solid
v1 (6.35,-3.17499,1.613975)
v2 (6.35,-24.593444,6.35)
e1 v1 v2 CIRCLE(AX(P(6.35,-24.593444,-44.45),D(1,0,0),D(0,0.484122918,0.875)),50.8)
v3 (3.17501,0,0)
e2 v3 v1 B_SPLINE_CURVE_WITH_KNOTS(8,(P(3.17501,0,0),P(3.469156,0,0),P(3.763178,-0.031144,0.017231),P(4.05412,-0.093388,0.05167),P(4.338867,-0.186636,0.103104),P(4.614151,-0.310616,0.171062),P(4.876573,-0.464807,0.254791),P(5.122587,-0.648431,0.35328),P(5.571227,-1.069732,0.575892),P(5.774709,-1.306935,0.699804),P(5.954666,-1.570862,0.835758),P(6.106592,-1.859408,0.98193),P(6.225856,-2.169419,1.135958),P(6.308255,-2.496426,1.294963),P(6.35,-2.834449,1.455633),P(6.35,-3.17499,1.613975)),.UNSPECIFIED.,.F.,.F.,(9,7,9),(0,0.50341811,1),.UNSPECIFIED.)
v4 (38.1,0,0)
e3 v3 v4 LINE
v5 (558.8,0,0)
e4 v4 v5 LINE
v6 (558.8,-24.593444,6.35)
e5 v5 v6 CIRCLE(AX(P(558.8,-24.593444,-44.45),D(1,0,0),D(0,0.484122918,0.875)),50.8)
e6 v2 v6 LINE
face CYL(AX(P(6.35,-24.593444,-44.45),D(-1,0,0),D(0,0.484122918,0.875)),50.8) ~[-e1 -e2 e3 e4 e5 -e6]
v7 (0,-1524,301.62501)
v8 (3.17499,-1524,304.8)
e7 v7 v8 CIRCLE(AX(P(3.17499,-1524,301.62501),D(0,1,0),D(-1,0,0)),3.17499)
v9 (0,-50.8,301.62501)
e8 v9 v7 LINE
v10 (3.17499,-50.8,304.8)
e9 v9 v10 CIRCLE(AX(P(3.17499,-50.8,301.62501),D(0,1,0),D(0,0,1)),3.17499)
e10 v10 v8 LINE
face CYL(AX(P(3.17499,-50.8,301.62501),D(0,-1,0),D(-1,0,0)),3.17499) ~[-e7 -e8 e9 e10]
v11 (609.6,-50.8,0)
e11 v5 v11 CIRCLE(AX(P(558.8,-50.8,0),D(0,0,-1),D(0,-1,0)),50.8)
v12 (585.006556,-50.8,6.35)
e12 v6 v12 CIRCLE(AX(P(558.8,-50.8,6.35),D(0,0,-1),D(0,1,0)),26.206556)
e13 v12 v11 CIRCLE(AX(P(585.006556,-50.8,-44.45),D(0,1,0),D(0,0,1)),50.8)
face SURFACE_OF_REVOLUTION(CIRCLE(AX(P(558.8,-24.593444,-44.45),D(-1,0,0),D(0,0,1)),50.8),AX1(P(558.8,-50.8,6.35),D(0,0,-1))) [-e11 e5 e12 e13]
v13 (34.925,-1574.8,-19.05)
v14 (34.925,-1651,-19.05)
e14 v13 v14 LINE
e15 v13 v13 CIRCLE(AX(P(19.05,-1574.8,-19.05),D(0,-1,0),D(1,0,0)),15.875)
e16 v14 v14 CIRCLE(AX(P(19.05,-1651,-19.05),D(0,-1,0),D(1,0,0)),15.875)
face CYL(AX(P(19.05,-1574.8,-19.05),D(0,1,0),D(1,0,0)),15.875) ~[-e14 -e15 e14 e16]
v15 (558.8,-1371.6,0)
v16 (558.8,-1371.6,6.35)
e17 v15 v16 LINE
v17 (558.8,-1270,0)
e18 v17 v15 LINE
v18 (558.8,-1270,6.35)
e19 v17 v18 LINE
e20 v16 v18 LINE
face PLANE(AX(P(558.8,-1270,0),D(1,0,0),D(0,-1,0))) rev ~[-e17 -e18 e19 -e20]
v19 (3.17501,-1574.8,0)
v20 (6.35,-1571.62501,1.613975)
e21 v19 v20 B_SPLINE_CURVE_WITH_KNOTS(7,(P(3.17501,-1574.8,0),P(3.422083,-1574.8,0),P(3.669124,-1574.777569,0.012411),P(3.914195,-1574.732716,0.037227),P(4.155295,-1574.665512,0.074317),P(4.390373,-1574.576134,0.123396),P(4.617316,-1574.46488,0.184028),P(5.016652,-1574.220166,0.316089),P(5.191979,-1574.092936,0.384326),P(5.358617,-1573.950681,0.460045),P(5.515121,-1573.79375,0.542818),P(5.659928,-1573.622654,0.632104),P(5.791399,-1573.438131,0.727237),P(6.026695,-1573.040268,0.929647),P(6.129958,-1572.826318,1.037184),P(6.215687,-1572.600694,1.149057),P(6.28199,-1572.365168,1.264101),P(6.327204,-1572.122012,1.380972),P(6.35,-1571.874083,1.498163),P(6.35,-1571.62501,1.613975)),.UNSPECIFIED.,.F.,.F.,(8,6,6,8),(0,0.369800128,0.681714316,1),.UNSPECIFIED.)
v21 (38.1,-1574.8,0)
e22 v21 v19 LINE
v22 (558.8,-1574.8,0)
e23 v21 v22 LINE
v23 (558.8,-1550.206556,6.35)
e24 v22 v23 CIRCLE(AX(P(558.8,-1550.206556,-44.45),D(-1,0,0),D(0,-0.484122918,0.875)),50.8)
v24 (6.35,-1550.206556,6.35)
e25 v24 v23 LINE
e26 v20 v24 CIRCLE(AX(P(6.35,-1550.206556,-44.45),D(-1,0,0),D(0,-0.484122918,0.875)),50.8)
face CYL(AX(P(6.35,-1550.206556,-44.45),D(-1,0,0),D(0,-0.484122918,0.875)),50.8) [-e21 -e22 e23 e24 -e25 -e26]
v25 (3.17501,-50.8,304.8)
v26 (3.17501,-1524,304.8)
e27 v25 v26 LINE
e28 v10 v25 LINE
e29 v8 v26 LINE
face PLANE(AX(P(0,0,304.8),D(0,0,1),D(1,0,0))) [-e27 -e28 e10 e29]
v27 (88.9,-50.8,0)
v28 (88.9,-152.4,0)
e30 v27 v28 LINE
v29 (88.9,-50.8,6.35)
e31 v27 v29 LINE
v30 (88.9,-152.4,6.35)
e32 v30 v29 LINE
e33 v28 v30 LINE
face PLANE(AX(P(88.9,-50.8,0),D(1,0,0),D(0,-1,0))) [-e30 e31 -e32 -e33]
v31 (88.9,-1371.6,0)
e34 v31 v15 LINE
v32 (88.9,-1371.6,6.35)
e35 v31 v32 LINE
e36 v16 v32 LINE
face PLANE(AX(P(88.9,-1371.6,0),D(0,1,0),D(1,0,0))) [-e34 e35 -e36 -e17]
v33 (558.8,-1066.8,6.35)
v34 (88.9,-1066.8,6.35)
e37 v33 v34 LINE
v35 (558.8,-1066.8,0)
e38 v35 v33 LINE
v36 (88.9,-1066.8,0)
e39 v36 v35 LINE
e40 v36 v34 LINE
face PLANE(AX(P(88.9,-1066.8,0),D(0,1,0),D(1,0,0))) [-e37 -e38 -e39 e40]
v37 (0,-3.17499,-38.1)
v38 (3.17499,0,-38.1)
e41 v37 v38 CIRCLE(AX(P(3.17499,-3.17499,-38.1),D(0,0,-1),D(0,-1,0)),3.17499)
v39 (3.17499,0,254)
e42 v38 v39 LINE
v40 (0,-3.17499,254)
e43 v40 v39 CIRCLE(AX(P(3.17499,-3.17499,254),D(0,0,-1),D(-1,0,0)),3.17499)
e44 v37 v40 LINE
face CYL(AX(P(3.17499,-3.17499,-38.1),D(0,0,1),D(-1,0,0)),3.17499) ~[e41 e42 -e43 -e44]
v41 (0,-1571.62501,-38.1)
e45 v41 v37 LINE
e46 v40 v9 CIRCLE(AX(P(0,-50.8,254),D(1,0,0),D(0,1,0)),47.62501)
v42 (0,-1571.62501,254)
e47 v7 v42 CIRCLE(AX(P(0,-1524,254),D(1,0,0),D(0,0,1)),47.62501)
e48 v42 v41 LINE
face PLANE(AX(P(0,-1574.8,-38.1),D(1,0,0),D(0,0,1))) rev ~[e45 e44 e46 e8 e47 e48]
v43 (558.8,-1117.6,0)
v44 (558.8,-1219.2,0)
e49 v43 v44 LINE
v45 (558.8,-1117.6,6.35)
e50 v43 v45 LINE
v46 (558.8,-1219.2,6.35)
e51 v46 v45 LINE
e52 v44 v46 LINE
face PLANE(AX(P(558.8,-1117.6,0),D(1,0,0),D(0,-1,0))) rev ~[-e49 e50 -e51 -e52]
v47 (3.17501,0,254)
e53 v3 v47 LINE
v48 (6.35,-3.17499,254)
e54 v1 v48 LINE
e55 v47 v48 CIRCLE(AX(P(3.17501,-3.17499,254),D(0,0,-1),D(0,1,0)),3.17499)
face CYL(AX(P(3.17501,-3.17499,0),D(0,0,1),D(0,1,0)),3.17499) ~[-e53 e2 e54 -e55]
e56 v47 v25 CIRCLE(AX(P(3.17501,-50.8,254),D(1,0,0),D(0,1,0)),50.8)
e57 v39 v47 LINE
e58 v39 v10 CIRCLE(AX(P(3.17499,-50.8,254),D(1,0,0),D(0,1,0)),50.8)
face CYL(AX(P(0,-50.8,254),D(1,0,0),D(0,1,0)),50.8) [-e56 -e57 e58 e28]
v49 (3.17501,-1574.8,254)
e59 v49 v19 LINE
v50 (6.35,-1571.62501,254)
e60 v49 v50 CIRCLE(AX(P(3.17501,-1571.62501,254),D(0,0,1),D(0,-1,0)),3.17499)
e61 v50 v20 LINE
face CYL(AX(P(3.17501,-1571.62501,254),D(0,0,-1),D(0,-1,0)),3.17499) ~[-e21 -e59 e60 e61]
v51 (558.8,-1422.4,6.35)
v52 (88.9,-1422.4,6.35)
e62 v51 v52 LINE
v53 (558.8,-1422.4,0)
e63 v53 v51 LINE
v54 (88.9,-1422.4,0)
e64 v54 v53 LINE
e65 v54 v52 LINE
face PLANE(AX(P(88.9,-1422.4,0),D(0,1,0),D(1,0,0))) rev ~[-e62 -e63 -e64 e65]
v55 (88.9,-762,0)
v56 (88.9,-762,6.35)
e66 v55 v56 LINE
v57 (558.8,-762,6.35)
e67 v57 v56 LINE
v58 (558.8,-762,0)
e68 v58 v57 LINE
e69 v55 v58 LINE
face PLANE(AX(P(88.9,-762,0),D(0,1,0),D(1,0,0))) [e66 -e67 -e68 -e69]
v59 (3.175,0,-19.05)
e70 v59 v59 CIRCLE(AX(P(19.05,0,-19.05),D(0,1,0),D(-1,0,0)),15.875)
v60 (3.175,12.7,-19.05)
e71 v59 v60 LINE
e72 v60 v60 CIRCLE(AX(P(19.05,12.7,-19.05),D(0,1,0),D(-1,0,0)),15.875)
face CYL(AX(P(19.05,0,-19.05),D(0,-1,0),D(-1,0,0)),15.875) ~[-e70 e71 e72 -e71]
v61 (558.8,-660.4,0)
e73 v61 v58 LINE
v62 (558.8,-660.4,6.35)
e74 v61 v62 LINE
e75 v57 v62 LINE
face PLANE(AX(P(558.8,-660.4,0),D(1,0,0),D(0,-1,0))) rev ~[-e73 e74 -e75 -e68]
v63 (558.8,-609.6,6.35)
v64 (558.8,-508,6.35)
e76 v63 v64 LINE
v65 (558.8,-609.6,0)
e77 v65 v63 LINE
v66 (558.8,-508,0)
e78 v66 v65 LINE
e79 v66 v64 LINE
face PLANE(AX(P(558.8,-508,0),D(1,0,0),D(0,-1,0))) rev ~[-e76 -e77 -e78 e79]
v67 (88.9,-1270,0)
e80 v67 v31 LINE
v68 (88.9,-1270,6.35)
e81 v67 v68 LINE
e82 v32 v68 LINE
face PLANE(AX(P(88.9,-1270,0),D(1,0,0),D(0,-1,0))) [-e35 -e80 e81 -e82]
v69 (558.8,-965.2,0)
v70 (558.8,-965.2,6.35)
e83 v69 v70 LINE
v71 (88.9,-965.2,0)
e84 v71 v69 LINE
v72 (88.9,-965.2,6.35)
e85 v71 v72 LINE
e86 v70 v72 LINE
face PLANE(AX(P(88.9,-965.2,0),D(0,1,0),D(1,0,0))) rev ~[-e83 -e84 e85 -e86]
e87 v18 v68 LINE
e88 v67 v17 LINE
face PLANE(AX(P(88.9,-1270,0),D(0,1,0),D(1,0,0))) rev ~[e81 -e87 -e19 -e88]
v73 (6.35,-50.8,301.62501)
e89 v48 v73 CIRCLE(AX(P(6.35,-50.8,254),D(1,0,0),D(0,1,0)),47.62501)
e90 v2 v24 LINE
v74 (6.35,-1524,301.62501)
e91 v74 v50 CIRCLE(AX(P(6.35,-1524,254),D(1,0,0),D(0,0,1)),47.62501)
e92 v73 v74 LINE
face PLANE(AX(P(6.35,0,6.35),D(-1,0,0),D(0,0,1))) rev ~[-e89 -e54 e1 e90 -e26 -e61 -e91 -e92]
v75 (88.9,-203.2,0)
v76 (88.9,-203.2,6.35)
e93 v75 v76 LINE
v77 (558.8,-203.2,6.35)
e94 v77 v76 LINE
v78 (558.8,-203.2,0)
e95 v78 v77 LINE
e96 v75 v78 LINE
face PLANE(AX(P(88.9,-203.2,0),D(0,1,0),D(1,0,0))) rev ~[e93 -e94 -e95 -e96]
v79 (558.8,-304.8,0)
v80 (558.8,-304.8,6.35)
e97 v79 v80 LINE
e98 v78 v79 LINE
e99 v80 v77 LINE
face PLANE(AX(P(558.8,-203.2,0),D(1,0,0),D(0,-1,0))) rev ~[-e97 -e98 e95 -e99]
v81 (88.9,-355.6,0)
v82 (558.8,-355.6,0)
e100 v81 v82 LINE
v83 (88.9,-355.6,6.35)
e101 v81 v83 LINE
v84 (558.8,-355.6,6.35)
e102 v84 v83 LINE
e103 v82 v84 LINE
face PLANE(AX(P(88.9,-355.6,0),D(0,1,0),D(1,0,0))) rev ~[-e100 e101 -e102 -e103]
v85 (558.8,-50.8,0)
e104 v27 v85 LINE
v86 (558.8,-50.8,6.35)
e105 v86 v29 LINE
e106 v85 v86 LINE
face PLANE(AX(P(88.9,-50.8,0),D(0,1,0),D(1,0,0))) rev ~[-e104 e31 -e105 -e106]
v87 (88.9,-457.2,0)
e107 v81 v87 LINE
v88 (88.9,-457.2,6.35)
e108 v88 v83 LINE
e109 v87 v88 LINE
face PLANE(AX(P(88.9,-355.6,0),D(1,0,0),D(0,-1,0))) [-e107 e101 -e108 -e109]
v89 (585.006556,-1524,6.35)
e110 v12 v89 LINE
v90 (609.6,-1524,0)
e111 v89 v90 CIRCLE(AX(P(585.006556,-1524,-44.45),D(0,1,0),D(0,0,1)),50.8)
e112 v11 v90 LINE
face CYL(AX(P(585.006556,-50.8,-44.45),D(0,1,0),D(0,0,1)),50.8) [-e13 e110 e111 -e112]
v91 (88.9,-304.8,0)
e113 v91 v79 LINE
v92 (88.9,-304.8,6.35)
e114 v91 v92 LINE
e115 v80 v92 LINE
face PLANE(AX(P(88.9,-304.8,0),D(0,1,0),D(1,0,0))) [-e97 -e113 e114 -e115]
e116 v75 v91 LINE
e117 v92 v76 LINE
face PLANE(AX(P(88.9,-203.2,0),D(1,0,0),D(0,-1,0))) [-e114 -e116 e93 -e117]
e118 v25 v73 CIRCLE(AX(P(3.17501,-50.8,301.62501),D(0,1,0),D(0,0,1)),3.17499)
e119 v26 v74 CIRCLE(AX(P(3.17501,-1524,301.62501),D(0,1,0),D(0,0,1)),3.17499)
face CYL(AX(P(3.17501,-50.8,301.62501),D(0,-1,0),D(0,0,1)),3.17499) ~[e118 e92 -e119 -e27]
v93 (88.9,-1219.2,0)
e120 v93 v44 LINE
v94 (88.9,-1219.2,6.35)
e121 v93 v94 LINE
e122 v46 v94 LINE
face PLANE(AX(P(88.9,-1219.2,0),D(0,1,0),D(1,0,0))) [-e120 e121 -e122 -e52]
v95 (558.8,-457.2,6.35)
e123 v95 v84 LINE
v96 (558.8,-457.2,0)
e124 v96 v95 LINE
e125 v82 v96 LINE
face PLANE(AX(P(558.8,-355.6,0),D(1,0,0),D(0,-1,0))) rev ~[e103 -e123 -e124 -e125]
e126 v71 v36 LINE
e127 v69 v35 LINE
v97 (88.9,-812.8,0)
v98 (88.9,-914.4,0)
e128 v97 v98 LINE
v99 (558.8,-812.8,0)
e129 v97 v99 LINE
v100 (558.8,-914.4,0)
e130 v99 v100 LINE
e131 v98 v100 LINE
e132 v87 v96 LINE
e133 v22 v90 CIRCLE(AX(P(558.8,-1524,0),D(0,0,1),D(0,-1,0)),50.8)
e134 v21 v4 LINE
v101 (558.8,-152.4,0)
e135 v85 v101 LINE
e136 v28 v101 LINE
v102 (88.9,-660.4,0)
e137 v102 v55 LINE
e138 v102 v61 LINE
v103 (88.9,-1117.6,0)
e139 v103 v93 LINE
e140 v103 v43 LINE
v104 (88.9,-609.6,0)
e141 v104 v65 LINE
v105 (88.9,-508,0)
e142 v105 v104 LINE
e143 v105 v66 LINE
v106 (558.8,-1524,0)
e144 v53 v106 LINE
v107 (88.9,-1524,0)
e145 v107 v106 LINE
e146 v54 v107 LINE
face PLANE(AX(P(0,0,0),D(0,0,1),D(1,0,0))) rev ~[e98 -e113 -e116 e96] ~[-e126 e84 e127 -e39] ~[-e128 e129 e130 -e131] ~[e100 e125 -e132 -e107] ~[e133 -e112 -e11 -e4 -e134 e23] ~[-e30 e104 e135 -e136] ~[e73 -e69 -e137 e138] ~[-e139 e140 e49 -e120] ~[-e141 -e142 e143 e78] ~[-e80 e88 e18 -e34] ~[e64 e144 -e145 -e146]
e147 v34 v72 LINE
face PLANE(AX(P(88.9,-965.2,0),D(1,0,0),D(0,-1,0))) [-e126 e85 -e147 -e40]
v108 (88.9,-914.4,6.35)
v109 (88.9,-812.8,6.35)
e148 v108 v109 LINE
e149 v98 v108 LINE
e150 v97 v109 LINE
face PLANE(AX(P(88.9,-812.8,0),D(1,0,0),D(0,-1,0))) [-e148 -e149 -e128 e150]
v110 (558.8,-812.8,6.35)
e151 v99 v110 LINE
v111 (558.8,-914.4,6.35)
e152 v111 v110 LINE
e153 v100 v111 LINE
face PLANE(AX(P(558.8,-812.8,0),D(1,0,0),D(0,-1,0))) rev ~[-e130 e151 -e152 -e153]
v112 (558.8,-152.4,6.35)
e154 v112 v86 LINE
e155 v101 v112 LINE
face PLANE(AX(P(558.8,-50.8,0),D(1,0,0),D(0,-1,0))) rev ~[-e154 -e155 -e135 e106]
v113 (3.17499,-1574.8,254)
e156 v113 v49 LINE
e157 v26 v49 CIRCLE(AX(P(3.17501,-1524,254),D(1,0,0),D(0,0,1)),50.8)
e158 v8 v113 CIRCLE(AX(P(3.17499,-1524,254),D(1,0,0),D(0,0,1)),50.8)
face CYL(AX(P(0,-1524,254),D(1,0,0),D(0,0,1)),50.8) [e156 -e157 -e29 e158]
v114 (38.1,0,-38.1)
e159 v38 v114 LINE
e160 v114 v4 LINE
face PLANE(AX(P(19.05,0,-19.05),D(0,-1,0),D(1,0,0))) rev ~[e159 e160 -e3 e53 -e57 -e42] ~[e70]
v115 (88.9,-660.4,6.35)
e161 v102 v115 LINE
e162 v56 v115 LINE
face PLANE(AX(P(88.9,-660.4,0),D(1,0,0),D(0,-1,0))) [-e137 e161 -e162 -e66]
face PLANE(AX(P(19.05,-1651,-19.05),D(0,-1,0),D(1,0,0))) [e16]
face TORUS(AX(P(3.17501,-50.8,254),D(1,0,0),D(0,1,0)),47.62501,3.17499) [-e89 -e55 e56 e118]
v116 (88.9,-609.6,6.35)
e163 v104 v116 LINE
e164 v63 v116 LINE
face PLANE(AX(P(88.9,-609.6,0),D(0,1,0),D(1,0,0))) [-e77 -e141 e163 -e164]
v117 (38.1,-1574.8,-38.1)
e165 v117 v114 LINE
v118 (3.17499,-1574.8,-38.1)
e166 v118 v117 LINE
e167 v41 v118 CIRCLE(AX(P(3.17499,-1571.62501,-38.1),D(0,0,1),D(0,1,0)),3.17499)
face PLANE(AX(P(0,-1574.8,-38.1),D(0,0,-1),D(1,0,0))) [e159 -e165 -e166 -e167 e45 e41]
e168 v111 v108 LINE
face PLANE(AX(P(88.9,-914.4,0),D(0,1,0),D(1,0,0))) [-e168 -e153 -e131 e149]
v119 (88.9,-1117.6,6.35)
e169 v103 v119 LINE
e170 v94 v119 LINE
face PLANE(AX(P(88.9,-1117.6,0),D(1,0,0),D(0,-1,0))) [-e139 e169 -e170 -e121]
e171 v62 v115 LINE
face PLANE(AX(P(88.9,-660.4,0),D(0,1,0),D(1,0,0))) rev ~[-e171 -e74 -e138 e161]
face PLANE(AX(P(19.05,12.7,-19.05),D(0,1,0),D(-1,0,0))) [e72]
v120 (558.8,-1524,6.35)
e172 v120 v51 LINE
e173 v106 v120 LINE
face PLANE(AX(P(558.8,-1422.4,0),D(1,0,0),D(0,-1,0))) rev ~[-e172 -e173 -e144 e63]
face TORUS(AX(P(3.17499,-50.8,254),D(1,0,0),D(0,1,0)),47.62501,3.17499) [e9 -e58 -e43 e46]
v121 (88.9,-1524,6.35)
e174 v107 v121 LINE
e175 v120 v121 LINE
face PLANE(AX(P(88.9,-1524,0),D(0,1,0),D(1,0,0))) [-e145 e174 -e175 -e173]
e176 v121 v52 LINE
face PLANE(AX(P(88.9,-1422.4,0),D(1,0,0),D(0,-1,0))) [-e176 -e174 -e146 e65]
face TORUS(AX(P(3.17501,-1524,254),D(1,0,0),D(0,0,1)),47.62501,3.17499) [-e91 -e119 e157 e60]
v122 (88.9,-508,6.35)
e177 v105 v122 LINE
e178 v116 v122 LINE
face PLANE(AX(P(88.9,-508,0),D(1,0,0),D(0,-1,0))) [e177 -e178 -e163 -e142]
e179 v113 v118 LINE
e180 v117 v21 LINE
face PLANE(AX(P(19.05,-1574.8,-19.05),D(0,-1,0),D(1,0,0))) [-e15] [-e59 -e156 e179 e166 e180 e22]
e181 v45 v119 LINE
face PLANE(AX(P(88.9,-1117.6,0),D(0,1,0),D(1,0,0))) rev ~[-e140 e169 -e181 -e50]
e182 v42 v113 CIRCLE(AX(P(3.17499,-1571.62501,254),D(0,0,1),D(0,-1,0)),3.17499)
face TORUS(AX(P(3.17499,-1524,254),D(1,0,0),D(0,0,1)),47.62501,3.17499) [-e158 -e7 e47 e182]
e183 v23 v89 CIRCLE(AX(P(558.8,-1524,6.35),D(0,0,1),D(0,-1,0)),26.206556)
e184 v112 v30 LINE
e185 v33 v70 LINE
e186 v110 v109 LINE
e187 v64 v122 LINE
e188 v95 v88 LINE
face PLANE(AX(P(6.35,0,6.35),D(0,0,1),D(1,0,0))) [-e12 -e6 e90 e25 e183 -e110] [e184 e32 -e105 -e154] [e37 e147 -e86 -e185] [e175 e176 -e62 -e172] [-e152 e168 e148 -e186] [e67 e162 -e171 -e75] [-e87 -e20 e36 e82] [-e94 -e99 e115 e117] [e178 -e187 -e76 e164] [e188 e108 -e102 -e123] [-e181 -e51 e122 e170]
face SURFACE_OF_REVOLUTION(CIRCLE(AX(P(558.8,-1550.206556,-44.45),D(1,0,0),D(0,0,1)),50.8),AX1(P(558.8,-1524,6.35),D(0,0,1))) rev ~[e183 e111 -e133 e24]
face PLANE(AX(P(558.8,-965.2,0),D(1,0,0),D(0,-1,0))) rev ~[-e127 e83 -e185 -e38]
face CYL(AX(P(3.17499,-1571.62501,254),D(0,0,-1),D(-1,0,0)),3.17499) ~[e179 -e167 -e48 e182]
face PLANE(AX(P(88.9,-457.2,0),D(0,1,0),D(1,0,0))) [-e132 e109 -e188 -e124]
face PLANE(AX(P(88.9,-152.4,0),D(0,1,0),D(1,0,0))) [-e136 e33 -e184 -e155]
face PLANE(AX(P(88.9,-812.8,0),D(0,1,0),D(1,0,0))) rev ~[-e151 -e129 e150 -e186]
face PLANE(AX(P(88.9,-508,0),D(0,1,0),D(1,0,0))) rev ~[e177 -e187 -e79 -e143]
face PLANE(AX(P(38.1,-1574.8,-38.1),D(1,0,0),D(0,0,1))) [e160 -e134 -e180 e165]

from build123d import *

# Parameters (mm, degrees)
F0_W         = 6.35
F0_H         = 298.45
F0_W_2       = 603.25
F0_H_2       = 6.35
F1_DEPTH     = 1574.8
F2_W         = 38.1
F2_H         = 38.1
F3_DEPTH     = 1574.8
F4_R         = 15.875
F5_DEPTH     = 76.2
F6_R         = 15.875
F7_DEPTH     = 12.7
F8_W         = 469.9
F8_H         = 101.6
F9_DEPTH     = 25.4
F10_R        = 50.8
F11_T1_DEPTH = 1473.2
F11_T3_DEPTH = 552.45
F11_T6_ANGLE = 90
F11_T8_ANGLE = 90
F12_R        = 3.17499


# Not quite as in the source:
# - a fillet or chamfer that OpenCascade refuses, or shapes differently, is made with other operations: its cross-section is extruded or revolved along the edge and cut away or added
# - a fillet or chamfer is up to 0.001 mm smaller than in the source, because OpenCascade refuses the exact size


with BuildPart() as f1:
    # F0 (on Front) → F1 (new body)
    with BuildSketch(Plane.XZ):
        with Locations((3.175, 155.575)):
            Rectangle(F0_W, F0_H)
        with Locations((307.975, 3.175)):
            Rectangle(F0_W_2, F0_H_2)
        with Locations((3.175, 3.175)):
            Rectangle(F0_W, F0_H_2)
    extrude(amount=F1_DEPTH)

    # F2 (on face) → F3 (join)
    with BuildSketch(Plane.XZ.offset(1574.8)):
        with Locations((19.05, -19.05)):
            Rectangle(F2_W, F2_H)
    extrude(amount=-F3_DEPTH)

    # F4 (on face) → F5 (join)
    with BuildSketch(Plane.XZ.offset(1574.8)):
        with Locations((19.05, -19.05)):
            Circle(F4_R)
    extrude(amount=F5_DEPTH)

    # F6 (on face) → F7 (join)
    with BuildSketch(Plane(origin=(0, 0, 0), x_dir=(-1, 0, 0), z_dir=(0, 1, 0))):
        with Locations((-19.05, -19.05)):
            Circle(F6_R)
    extrude(amount=F7_DEPTH)

    # F8 (on face) → F9 (cut)
    with BuildSketch(Plane(origin=(0, 0, 0), x_dir=(1, 0, 0), z_dir=(0, 0, -1))):
        with Locations((323.85, 1473.2)):
            Rectangle(F8_W, F8_H)
        with Locations((323.85, 1320.8)):
            Rectangle(F8_W, F8_H)
        with Locations((323.85, 1168.4)):
            Rectangle(F8_W, F8_H)
        with Locations((323.85, 1016)):
            Rectangle(F8_W, F8_H)
        with Locations((323.85, 863.6)):
            Rectangle(F8_W, F8_H)
        with Locations((323.85, 711.2)):
            Rectangle(F8_W, F8_H)
        with Locations((323.85, 558.8)):
            Rectangle(F8_W, F8_H)
        with Locations((323.85, 406.4)):
            Rectangle(F8_W, F8_H)
        with Locations((323.85, 254)):
            Rectangle(F8_W, F8_H)
        with Locations((323.85, 101.6)):
            Rectangle(F8_W, F8_H)
    extrude(amount=-F9_DEPTH, mode=Mode.SUBTRACT)

    # F10
    f10_edges = [f1.edges().sort_by_distance(p)[0] for p in [
        (609.6, 0, 3.175),
        (609.6, -1574.8, 3.175),
        (3.175, -1574.8, 304.8),
        (3.175, 0, 304.8),
    ]]
    fillet(f10_edges, radius=F10_R)

    # F11: fillet of radius 50.8 on 1 edges, made by hand

    # F11_s2 → F11_t1 (cut)
    with BuildSketch(Plane.XZ.offset(50.8)):
        with BuildLine():
            ThreePointArc((585.0065557516, 6.35), (597.7065557516, 4.7368884968), (609.6, 0))
            Line((609.6, 0), (609.6, 6.35))
            Line((609.6, 6.35), (585.0065557516, 6.35))
        make_face()
    extrude(amount=F11_T1_DEPTH, mode=Mode.SUBTRACT)

    # F11_s4 → F11_t3 (cut)
    with BuildSketch(Plane.YZ.offset(6.35)):
        with BuildLine():
            ThreePointArc((-1574.8, 0), (-1562.9065557516, 4.7368884968), (-1550.2065557516, 6.35))
            Line((-1550.2065557516, 6.35), (-1574.8, 6.35))
            Line((-1574.8, 6.35), (-1574.8, 0))
        make_face()
        with BuildLine():
            ThreePointArc((0, 0), (-11.8934442484, 4.7368884968), (-24.5934442484, 6.35))
            Line((-24.5934442484, 6.35), (0, 6.35))
            Line((0, 6.35), (0, 0))
        make_face()
    extrude(amount=F11_T3_DEPTH, mode=Mode.SUBTRACT)

    # F11_s5 → F11_t6 (revolve, cut)
    with BuildSketch(Plane.YZ.offset(558.8)):
        with BuildLine():
            ThreePointArc((-24.5934442484, 6.35), (-11.8934442484, 4.7368884968), (0, 0))
            Line((0, 0), (0, 6.35))
            Line((0, 6.35), (-24.5934442484, 6.35))
        make_face()
    revolve(axis=Axis((558.8, -50.8, 6.35), (0, 0, -1)), revolution_arc=F11_T6_ANGLE, mode=Mode.SUBTRACT)

    # F11_s7 → F11_t8 (revolve, cut)
    with BuildSketch(Plane.YZ.offset(558.8)):
        with BuildLine():
            ThreePointArc((-1550.2065557516, 6.35), (-1562.9065557516, 4.7368884968), (-1574.8, 0))
            Line((-1574.8, 0), (-1574.8, 6.35))
            Line((-1574.8, 6.35), (-1550.2065557516, 6.35))
        make_face()
    revolve(axis=Axis((558.8, -1524, 6.35), (0, 0, 1)), revolution_arc=F11_T8_ANGLE, mode=Mode.SUBTRACT)

    # F12 (radius 3.175 in the source; OpenCascade refuses exactly that, so slightly less here)
    f12_edges = [f1.edges().sort_by_distance(p)[0] for p in [
        (6.35, -787.4, 304.8),
        (0, -787.4, 304.8),
        (0, -14.878976, 289.921024),
        (0, -1559.921024, 289.921024),
        (0, 0, 107.95),
        (0, -1574.8, 107.95),
        (6.35, -14.878976, 289.921024),
        (6.35, -1559.921024, 289.921024),
        (6.35, 0, 127),
        (6.35, -1574.8, 127),
    ]]
    fillet(f12_edges, radius=F12_R)


solid = f1.part
